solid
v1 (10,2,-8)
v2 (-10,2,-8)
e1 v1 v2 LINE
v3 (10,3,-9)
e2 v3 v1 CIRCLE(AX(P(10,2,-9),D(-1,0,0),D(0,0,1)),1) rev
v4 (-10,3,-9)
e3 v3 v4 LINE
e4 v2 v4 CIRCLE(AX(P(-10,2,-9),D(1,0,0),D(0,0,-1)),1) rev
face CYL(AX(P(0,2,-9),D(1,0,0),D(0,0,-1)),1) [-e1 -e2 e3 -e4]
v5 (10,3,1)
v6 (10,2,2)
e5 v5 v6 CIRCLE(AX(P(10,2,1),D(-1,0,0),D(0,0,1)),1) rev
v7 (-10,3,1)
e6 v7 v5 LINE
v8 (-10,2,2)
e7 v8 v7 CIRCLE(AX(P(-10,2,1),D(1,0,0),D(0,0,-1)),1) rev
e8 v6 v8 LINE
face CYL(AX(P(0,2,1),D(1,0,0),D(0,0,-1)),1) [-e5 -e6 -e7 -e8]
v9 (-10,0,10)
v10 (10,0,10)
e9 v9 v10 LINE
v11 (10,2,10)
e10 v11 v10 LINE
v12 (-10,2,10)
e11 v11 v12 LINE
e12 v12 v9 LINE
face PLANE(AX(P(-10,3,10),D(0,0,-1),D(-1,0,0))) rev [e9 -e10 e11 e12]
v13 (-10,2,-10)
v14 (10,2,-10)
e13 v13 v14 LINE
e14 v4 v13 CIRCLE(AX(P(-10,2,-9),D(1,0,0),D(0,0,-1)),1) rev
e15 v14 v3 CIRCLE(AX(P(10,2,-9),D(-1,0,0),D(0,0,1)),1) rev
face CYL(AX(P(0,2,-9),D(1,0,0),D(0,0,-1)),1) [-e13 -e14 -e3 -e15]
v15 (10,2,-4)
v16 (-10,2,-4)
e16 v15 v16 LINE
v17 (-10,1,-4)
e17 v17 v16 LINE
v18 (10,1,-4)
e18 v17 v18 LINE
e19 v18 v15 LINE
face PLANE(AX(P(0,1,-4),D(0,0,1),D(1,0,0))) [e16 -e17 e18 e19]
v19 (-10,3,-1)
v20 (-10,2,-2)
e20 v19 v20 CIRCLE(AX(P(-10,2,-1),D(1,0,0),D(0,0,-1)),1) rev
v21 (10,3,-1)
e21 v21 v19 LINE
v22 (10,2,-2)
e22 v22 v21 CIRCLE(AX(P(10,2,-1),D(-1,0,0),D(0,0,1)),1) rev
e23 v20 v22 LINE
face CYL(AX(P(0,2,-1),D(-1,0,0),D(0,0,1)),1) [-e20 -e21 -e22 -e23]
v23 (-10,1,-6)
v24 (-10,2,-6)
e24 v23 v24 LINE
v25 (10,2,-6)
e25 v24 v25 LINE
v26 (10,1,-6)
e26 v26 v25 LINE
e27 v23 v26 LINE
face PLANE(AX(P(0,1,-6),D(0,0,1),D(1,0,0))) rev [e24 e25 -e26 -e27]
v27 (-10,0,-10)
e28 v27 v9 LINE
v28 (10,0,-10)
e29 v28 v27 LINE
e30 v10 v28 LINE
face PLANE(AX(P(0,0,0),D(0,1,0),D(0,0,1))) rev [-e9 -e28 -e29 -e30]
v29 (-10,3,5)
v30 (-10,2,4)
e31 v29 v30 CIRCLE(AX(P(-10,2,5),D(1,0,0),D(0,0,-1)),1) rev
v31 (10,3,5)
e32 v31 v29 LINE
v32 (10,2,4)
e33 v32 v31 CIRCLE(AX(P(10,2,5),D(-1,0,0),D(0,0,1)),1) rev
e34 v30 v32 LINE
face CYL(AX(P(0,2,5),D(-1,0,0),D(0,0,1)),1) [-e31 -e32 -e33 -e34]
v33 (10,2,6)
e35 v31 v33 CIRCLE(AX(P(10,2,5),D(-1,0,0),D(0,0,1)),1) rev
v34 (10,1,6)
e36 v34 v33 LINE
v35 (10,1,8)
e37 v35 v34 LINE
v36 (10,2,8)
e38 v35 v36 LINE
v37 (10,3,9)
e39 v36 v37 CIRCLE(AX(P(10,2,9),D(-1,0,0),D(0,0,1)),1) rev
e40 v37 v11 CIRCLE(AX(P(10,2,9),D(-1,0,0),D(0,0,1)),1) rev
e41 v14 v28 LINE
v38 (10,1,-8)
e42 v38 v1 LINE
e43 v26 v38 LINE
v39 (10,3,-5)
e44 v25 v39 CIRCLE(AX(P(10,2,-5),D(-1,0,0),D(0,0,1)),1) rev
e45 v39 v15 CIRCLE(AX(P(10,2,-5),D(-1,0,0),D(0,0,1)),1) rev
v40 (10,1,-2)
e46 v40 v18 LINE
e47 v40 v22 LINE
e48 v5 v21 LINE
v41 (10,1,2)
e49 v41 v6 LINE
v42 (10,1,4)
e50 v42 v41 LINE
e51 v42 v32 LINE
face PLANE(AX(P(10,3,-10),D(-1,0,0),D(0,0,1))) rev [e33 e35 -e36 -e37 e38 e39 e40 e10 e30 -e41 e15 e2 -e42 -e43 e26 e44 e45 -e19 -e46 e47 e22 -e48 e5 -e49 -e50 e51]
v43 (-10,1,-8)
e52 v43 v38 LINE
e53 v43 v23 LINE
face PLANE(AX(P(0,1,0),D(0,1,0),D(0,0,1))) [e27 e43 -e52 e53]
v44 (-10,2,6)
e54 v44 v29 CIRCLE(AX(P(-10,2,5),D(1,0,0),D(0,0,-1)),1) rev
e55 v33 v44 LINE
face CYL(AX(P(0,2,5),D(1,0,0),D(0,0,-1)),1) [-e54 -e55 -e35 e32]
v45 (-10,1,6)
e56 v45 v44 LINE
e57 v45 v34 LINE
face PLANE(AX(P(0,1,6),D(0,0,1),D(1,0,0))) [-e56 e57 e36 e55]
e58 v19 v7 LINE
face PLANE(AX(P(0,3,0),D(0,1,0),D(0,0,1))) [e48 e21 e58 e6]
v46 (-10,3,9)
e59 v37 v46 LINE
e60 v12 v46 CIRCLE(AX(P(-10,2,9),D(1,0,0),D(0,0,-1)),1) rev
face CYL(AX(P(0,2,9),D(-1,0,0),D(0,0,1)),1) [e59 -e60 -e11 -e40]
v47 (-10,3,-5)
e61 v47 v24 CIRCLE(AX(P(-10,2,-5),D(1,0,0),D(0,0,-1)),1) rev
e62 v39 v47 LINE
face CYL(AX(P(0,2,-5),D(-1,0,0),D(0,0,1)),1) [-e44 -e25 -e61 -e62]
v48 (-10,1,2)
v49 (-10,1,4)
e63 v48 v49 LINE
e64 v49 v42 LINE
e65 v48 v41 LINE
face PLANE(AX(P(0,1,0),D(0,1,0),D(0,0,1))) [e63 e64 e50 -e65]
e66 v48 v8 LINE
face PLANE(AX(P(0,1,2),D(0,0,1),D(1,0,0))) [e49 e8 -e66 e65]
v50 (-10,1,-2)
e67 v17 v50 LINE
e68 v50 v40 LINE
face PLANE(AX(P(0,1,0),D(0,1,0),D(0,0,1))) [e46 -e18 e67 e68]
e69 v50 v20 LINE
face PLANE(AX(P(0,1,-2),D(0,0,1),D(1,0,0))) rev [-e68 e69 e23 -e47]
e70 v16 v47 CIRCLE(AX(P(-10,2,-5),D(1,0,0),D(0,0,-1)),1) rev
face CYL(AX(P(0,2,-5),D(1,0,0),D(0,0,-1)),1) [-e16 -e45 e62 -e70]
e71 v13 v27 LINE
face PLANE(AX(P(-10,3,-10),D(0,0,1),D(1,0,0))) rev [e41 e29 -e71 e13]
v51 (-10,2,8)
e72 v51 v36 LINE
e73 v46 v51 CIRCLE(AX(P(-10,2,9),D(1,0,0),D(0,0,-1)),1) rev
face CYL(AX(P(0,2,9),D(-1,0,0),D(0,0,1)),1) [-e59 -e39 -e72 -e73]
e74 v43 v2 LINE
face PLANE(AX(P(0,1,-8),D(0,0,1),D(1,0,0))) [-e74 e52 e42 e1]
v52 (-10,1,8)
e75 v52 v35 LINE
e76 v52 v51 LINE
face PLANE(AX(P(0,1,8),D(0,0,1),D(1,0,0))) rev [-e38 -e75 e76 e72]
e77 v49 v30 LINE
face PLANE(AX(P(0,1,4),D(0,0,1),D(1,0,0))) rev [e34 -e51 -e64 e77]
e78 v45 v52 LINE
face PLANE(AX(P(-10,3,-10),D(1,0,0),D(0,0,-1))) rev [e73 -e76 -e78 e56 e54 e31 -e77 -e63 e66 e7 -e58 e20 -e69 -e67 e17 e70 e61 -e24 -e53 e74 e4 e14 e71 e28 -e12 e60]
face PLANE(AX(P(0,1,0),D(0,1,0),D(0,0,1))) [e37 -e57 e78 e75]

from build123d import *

# Parameters (mm, degrees)
SKETCH_1_W          = 20
SKETCH_1_H          = 20
EXTRUDE_1_DEPTH     = 3
SKETCH_2_W          = 20
SKETCH_2_H          = 2
CUT_EXTRUDE_1_DEPTH = 2
FILLET_1_R          = 1


with BuildPart() as part:
    # 草图1 → 凸台-拉伸1 (new body)
    with BuildSketch(Plane(origin=(0, 0, 0), x_dir=(1, 0, 0), z_dir=(0, 1, 0))):
        Rectangle(SKETCH_1_W, SKETCH_1_H)
    extrude(amount=EXTRUDE_1_DEPTH)

    # 草图2 → 切除-拉伸1 (cut)
    with BuildSketch(Plane(origin=(0, 3, 0), x_dir=(1, 0, 0), z_dir=(0, 1, 0))):
        with Locations((0, -7)):
            Rectangle(SKETCH_2_W, SKETCH_2_H)
        with Locations((0, -3)):
            Rectangle(SKETCH_2_W, SKETCH_2_H)
        with Locations((0, 7)):
            Rectangle(SKETCH_2_W, SKETCH_2_H)
        with Locations((0, 3)):
            Rectangle(SKETCH_2_W, SKETCH_2_H)
    extrude(amount=-CUT_EXTRUDE_1_DEPTH, mode=Mode.SUBTRACT)

    # 圆角1
    fillet_1_edges = [part.edges().sort_by_distance(p)[0] for p in [
        (0, 3, 10),
        (0, 3, 6),
        (0, 3, 8),
        (0, 3, -4),
        (0, 3, -2),
        (0, 3, -8),
        (0, 3, -6),
        (0, 3, 2),
        (0, 3, 4),
        (0, 3, -10),
    ]]
    fillet(fillet_1_edges, radius=FILLET_1_R - 0.0001)  # a hair under: the kernel refuses the full size


solid = part.part
